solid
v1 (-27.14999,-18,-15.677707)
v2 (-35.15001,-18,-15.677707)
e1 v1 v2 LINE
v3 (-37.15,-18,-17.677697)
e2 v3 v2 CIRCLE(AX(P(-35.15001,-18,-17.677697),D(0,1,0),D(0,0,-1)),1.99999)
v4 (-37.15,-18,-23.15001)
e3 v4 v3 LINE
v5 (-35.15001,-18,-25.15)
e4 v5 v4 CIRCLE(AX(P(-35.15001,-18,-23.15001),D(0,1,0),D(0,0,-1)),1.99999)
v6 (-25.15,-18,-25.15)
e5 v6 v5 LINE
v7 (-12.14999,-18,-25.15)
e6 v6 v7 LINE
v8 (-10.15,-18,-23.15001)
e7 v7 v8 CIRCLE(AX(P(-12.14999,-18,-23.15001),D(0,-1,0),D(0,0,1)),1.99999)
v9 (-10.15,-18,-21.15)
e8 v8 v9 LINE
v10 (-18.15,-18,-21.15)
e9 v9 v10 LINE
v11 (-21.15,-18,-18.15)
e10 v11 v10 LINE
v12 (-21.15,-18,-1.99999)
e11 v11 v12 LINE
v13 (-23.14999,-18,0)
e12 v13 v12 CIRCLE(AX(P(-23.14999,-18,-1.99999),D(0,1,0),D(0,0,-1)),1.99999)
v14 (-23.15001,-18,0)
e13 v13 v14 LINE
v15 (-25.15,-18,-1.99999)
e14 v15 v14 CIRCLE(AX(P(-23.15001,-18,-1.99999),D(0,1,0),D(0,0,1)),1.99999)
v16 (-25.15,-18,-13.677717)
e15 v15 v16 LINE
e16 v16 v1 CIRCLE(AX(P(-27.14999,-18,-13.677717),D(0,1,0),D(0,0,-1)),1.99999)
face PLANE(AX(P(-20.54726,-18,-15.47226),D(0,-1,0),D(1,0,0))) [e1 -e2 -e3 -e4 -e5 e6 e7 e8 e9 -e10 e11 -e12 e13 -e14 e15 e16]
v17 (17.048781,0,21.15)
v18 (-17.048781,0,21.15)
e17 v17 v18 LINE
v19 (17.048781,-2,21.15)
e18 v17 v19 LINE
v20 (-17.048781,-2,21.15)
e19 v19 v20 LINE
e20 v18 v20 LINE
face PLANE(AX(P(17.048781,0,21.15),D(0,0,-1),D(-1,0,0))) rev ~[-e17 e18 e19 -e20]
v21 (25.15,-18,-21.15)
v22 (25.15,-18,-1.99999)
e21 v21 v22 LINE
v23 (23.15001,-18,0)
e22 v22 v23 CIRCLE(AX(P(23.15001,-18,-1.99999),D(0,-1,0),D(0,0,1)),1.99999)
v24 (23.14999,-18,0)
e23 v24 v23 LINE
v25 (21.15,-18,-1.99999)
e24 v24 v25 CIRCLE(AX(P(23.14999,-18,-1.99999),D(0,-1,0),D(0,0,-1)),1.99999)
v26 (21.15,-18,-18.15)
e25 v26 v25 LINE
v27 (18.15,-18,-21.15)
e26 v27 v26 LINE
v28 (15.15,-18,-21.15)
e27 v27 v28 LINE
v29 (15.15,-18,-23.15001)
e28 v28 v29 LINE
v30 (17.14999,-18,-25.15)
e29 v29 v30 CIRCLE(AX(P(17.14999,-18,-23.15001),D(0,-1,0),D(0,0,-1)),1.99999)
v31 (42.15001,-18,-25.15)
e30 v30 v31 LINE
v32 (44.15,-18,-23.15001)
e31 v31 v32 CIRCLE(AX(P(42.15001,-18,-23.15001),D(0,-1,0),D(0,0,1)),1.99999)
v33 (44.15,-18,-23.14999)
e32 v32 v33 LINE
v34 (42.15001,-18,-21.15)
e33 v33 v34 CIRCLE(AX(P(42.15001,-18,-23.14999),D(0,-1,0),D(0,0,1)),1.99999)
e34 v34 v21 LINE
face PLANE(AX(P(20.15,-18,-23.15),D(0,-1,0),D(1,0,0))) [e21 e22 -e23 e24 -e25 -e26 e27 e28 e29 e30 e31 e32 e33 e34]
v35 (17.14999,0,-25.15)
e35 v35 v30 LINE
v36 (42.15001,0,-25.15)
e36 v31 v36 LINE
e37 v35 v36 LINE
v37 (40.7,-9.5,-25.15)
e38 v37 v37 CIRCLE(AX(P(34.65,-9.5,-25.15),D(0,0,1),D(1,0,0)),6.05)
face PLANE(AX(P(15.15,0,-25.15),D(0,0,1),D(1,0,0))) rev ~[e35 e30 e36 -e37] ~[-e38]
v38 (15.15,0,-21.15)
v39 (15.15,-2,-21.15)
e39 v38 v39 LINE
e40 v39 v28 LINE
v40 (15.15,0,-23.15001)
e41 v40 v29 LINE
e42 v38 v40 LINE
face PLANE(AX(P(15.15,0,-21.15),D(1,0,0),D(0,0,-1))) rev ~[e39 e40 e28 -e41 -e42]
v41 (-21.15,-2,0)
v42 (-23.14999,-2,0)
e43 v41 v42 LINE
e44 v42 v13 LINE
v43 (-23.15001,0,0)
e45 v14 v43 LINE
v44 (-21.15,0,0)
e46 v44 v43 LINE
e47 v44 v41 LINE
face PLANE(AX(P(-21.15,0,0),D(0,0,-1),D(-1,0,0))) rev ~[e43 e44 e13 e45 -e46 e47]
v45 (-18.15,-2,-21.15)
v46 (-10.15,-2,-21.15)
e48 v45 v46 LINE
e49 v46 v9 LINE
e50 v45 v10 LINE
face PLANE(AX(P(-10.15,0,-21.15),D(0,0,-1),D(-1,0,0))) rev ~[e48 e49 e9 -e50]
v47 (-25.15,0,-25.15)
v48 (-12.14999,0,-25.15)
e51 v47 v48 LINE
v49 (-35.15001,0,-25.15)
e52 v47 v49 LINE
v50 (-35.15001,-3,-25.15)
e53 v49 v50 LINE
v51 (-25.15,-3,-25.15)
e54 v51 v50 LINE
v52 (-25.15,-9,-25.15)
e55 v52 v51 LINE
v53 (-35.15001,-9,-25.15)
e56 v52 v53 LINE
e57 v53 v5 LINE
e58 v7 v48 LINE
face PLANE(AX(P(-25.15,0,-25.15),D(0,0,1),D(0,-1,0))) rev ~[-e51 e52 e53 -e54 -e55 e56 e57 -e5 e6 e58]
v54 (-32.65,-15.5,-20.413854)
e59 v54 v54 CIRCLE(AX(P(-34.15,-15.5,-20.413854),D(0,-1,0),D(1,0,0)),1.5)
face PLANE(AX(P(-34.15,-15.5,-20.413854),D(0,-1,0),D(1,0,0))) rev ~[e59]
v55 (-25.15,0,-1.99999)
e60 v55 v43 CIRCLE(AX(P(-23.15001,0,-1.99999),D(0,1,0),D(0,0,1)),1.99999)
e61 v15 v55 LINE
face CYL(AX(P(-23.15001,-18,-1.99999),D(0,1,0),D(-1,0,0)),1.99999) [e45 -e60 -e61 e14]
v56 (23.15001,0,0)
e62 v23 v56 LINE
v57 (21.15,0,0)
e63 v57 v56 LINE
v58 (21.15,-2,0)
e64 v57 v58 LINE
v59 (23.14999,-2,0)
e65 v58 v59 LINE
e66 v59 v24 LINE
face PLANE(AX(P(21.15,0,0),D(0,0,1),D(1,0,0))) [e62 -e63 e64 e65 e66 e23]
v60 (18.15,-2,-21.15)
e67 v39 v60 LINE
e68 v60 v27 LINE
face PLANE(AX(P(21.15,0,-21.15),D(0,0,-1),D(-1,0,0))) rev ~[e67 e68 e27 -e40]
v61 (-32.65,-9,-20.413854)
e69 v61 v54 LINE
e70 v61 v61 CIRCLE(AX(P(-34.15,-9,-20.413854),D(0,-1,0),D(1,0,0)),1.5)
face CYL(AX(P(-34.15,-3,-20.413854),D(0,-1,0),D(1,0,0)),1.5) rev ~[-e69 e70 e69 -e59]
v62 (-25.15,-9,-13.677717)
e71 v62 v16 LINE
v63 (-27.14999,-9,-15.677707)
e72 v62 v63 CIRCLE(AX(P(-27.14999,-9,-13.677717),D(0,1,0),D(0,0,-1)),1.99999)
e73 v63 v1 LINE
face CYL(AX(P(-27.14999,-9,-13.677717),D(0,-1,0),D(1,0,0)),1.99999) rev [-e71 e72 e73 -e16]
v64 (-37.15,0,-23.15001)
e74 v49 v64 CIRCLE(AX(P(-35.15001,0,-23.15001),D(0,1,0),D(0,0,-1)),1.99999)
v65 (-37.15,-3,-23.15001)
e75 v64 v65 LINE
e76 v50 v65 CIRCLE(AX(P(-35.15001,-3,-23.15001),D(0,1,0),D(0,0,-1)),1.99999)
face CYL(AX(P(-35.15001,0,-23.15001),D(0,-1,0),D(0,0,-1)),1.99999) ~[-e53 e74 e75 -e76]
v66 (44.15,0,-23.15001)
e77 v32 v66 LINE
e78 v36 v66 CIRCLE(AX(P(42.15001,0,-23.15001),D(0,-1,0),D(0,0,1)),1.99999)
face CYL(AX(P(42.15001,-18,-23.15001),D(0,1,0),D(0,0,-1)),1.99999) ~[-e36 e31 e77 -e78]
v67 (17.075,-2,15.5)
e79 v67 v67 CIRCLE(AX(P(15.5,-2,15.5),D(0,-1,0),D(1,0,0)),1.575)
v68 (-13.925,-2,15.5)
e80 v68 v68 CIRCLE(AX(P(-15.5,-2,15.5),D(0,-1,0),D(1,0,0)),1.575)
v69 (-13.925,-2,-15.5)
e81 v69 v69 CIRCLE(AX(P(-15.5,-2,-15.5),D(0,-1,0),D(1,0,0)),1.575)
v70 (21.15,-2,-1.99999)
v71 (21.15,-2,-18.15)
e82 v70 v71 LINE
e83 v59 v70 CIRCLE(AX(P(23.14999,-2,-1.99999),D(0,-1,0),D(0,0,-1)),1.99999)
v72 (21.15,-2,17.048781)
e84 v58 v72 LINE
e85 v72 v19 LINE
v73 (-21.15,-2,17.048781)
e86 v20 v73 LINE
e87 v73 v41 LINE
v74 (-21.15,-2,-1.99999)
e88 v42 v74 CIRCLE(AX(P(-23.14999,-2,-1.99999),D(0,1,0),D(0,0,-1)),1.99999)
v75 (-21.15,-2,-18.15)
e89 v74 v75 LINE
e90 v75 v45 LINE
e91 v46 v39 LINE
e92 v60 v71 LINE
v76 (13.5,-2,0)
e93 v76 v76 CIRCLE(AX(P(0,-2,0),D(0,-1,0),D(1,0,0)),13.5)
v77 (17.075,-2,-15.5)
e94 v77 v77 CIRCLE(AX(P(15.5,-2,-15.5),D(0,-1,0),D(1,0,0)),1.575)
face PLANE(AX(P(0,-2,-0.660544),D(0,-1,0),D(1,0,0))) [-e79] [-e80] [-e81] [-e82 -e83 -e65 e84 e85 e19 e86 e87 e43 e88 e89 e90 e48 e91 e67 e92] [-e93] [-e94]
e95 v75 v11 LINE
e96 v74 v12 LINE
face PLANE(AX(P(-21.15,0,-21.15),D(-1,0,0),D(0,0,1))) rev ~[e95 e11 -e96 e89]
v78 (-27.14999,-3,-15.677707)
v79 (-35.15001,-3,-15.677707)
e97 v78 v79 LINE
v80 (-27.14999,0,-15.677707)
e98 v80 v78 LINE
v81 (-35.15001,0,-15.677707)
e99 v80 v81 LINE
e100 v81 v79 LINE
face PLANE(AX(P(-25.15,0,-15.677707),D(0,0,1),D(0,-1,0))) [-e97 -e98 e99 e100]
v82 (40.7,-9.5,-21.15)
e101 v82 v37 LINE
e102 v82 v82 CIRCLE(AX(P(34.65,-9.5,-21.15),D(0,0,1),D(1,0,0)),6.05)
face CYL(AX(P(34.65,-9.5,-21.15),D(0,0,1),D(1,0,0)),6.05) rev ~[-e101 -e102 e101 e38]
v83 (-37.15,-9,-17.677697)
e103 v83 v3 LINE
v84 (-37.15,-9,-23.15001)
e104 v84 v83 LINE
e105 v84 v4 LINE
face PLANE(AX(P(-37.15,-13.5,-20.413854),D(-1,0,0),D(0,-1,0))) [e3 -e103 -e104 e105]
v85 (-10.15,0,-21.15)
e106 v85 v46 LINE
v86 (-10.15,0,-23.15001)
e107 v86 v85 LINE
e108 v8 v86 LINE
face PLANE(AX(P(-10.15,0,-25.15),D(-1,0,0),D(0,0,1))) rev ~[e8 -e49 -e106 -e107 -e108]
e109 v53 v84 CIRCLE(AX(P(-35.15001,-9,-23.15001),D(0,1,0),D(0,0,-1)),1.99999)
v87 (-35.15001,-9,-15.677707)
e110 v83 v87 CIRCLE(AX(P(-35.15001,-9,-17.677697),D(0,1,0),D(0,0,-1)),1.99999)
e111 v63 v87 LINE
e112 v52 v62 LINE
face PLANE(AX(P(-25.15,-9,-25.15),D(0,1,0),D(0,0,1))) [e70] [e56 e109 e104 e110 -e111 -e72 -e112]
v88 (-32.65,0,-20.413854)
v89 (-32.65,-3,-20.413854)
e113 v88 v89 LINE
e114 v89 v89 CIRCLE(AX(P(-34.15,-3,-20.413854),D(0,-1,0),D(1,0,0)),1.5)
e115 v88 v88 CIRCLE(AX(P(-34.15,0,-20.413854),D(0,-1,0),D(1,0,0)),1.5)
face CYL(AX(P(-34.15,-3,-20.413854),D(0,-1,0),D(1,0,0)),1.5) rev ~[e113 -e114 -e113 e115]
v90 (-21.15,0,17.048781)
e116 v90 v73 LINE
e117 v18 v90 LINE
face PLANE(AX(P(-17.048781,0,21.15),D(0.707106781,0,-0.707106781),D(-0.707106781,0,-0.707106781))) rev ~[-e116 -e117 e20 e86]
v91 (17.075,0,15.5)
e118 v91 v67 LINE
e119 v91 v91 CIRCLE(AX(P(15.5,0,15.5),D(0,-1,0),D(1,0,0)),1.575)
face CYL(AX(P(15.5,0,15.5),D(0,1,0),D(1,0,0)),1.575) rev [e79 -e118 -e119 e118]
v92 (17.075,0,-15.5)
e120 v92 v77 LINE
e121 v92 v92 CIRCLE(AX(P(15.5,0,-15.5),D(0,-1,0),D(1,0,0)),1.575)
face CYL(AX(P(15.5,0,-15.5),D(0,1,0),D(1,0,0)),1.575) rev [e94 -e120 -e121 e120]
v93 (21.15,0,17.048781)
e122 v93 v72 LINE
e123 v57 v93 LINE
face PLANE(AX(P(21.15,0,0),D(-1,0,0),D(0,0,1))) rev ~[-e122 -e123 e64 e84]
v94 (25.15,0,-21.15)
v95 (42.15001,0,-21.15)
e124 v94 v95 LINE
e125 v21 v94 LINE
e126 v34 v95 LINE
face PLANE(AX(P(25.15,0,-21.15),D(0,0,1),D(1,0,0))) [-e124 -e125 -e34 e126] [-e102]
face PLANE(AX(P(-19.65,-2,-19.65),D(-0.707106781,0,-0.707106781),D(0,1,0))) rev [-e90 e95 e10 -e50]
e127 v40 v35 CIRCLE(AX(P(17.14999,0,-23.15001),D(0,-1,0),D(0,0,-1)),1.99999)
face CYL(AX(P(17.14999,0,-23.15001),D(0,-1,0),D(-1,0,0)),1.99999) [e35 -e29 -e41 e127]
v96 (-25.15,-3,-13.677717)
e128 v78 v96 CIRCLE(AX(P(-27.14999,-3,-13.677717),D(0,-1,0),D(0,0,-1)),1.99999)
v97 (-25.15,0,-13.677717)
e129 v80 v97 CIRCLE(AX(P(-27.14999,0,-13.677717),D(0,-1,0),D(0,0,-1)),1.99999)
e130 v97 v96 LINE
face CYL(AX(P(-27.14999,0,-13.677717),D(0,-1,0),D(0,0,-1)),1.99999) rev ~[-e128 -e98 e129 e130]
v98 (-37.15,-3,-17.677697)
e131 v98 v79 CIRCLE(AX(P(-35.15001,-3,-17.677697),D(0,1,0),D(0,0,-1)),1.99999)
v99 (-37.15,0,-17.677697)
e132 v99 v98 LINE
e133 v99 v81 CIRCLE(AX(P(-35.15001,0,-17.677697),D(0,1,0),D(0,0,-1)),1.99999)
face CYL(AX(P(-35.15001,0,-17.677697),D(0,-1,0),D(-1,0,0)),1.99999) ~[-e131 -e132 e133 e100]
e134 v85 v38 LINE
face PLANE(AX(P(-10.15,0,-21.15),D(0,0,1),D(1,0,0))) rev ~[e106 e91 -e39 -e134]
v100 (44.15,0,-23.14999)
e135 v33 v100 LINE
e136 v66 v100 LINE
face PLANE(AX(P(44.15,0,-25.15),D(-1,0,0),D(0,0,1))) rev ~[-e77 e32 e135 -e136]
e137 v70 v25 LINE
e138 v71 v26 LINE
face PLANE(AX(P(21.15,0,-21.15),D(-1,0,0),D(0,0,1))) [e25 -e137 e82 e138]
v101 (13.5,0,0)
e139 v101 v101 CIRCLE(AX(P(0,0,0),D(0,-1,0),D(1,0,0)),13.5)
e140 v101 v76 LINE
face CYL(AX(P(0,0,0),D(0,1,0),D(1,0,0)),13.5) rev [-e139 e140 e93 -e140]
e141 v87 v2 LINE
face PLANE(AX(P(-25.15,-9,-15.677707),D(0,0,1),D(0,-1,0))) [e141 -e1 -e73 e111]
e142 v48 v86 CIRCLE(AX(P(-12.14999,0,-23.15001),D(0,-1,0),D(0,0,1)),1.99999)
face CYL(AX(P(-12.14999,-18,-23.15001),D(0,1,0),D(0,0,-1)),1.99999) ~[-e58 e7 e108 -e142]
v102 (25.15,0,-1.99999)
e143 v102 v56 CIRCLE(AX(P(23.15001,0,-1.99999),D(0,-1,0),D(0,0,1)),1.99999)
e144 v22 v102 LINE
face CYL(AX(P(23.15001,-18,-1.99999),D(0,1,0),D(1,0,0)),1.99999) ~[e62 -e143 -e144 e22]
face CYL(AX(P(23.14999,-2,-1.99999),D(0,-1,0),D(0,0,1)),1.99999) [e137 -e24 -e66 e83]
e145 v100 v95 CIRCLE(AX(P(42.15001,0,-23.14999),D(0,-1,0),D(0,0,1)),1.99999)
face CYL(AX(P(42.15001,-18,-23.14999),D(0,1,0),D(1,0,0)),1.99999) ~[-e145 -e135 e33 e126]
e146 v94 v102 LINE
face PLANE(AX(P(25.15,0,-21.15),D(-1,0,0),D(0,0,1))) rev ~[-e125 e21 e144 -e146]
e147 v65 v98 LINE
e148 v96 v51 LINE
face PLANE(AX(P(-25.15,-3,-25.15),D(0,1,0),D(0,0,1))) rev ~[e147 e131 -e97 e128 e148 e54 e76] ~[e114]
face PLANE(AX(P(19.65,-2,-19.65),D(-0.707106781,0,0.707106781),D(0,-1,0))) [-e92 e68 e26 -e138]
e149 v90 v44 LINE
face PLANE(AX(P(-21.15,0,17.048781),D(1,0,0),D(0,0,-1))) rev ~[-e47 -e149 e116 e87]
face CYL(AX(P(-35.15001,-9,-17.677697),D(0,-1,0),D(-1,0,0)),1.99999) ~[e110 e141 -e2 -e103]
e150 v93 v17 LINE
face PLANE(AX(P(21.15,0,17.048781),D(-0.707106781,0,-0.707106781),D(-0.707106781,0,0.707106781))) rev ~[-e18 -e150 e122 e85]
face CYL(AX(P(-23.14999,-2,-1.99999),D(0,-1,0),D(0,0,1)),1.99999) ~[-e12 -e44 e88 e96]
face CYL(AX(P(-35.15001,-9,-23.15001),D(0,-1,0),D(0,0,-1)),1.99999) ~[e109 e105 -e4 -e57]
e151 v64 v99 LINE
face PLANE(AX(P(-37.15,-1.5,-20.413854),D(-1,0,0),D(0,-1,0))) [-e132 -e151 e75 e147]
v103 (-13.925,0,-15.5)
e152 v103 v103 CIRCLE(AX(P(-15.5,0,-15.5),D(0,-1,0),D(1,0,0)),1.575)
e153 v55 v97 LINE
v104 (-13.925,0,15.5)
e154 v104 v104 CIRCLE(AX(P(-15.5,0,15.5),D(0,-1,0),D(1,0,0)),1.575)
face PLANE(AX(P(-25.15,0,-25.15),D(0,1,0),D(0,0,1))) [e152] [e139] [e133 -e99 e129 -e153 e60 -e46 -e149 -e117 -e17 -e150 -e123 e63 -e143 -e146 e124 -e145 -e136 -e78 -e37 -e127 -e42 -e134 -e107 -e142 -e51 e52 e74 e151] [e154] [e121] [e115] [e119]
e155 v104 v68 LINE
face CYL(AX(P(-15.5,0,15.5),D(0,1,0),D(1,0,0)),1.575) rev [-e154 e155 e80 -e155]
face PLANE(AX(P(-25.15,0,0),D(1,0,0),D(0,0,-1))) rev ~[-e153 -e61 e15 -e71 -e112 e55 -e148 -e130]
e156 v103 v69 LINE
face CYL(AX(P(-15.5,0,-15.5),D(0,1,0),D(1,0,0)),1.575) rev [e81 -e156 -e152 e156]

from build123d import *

# Parameters (mm, degrees)
F0_R     = 1.575
F0_R_2   = 13.5
F0_W     = 4
F0_H     = 21.15
F0_W_2   = 19
F0_H_2   = 4
F1_DEPTH = 2
F2_DEPTH = 18
F4_W     = 3
F4_H     = 9.4722927755
F4_W_2   = 9
F5_DEPTH = 12
F6_R     = 1.5
F7_DEPTH = 12.5
F3_R     = 6.05
F8_DEPTH = 25
F9_R     = 1.99999
F10_SIZE = 3


# Not quite as in the source:
# - a fillet or chamfer is up to 0.001 mm smaller than in the source, because OpenCascade refuses the exact size


with BuildPart() as f1:
    # F0 (on Front) → F1 (new body)
    with BuildSketch(Plane.XZ):
        Polygon((21.15, 17.0487806691), (17.0487806691, 21.15), (-17.0487806691, 21.15), (-21.15, 17.0487806691), (-21.15, 0), (-21.15, -21.15), (-10.15, -21.15), (15.15, -21.15), (21.15, -21.15), (21.15, 0), align=None)
        with Locations((-15.5, -15.5)):
            Circle(F0_R, mode=Mode.SUBTRACT)
        with Locations((15.5, -15.5)):
            Circle(F0_R, mode=Mode.SUBTRACT)
        Circle(F0_R_2, mode=Mode.SUBTRACT)
        with Locations((-15.5, 15.5)):
            Circle(F0_R, mode=Mode.SUBTRACT)
        with Locations((15.5, 15.5)):
            Circle(F0_R, mode=Mode.SUBTRACT)
        Polygon((-21.15, -21.15), (-21.15, 0), (-25.15, 0), (-25.15, -25.15), (-10.15, -25.15), (-10.15, -21.15), align=None)
        Polygon((25.15, -21.15), (21.15, -21.15), (15.15, -21.15), (15.15, -25.15), (25.15, -25.15), align=None)
        with Locations((23.15, -10.575)):
            Rectangle(F0_W, F0_H)
        with Locations((34.65, -23.15)):
            Rectangle(F0_W_2, F0_H_2)
    extrude(amount=F1_DEPTH)

    # F0 (on Front) → F2 (join)
    with BuildSketch(Plane.XZ):
        Polygon((-21.15, -21.15), (-21.15, 0), (-25.15, 0), (-25.15, -25.15), (-10.15, -25.15), (-10.15, -21.15), align=None)
        Polygon((25.15, -21.15), (21.15, -21.15), (15.15, -21.15), (15.15, -25.15), (25.15, -25.15), align=None)
        with Locations((34.65, -23.15)):
            Rectangle(F0_W_2, F0_H_2)
        with Locations((23.15, -10.575)):
            Rectangle(F0_W, F0_H)
    extrude(amount=F2_DEPTH)

    # F4 (on face) → F5 (join)
    with BuildSketch(Plane(origin=(-25.15, 0, 0), x_dir=(0, -1, 0), z_dir=(-1, 0, 0))):
        with Locations((1.5, -20.4138536122)):
            Rectangle(F4_W, F4_H)
        with Locations((13.5, -20.4138536122)):
            Rectangle(F4_W_2, F4_H)
    extrude(amount=F5_DEPTH)

    # F6 (on face) → F7 (cut, symmetric)
    with BuildSketch(Plane.XZ.offset(3)):
        with Locations((-34.15, -20.4138536122)):
            Circle(F6_R)
    extrude(amount=F7_DEPTH, both=True, mode=Mode.SUBTRACT)

    # F3 (on face) → F8 (cut)
    with BuildSketch(Plane.XY.offset(-21.15)):
        with Locations((34.65, -9.5)):
            Circle(F3_R)
    extrude(amount=-F8_DEPTH, mode=Mode.SUBTRACT)

    # F9 (radius 2 in the source; OpenCascade refuses exactly that, so slightly less here)
    f9_edges = [f1.edges().sort_by_distance(p)[0] for p in [
        (-25.15, -1.5, -15.677707),
        (-37.15, -1.5, -15.677707),
        (-37.15, -1.5, -25.15),
        (-37.15, -13.5, -15.677707),
        (-37.15, -13.5, -25.15),
        (-25.15, -13.5, -15.677707),
        (-10.15, -9, -25.15),
        (15.15, -9, -25.15),
        (44.15, -9, -25.15),
        (44.15, -9, -21.15),
        (25.15, -9, 0),
        (21.15, -10, 0),
        (-21.15, -10, 0),
        (-25.15, -9, 0),
    ]]
    fillet(f9_edges, radius=F9_R)

    # F10
    f10_edges = [f1.edges().sort_by_distance(p)[0] for p in [
        (21.15, -10, -21.15),
        (-21.15, -10, -21.15),
    ]]
    chamfer(f10_edges, length=F10_SIZE)


solid = f1.part
